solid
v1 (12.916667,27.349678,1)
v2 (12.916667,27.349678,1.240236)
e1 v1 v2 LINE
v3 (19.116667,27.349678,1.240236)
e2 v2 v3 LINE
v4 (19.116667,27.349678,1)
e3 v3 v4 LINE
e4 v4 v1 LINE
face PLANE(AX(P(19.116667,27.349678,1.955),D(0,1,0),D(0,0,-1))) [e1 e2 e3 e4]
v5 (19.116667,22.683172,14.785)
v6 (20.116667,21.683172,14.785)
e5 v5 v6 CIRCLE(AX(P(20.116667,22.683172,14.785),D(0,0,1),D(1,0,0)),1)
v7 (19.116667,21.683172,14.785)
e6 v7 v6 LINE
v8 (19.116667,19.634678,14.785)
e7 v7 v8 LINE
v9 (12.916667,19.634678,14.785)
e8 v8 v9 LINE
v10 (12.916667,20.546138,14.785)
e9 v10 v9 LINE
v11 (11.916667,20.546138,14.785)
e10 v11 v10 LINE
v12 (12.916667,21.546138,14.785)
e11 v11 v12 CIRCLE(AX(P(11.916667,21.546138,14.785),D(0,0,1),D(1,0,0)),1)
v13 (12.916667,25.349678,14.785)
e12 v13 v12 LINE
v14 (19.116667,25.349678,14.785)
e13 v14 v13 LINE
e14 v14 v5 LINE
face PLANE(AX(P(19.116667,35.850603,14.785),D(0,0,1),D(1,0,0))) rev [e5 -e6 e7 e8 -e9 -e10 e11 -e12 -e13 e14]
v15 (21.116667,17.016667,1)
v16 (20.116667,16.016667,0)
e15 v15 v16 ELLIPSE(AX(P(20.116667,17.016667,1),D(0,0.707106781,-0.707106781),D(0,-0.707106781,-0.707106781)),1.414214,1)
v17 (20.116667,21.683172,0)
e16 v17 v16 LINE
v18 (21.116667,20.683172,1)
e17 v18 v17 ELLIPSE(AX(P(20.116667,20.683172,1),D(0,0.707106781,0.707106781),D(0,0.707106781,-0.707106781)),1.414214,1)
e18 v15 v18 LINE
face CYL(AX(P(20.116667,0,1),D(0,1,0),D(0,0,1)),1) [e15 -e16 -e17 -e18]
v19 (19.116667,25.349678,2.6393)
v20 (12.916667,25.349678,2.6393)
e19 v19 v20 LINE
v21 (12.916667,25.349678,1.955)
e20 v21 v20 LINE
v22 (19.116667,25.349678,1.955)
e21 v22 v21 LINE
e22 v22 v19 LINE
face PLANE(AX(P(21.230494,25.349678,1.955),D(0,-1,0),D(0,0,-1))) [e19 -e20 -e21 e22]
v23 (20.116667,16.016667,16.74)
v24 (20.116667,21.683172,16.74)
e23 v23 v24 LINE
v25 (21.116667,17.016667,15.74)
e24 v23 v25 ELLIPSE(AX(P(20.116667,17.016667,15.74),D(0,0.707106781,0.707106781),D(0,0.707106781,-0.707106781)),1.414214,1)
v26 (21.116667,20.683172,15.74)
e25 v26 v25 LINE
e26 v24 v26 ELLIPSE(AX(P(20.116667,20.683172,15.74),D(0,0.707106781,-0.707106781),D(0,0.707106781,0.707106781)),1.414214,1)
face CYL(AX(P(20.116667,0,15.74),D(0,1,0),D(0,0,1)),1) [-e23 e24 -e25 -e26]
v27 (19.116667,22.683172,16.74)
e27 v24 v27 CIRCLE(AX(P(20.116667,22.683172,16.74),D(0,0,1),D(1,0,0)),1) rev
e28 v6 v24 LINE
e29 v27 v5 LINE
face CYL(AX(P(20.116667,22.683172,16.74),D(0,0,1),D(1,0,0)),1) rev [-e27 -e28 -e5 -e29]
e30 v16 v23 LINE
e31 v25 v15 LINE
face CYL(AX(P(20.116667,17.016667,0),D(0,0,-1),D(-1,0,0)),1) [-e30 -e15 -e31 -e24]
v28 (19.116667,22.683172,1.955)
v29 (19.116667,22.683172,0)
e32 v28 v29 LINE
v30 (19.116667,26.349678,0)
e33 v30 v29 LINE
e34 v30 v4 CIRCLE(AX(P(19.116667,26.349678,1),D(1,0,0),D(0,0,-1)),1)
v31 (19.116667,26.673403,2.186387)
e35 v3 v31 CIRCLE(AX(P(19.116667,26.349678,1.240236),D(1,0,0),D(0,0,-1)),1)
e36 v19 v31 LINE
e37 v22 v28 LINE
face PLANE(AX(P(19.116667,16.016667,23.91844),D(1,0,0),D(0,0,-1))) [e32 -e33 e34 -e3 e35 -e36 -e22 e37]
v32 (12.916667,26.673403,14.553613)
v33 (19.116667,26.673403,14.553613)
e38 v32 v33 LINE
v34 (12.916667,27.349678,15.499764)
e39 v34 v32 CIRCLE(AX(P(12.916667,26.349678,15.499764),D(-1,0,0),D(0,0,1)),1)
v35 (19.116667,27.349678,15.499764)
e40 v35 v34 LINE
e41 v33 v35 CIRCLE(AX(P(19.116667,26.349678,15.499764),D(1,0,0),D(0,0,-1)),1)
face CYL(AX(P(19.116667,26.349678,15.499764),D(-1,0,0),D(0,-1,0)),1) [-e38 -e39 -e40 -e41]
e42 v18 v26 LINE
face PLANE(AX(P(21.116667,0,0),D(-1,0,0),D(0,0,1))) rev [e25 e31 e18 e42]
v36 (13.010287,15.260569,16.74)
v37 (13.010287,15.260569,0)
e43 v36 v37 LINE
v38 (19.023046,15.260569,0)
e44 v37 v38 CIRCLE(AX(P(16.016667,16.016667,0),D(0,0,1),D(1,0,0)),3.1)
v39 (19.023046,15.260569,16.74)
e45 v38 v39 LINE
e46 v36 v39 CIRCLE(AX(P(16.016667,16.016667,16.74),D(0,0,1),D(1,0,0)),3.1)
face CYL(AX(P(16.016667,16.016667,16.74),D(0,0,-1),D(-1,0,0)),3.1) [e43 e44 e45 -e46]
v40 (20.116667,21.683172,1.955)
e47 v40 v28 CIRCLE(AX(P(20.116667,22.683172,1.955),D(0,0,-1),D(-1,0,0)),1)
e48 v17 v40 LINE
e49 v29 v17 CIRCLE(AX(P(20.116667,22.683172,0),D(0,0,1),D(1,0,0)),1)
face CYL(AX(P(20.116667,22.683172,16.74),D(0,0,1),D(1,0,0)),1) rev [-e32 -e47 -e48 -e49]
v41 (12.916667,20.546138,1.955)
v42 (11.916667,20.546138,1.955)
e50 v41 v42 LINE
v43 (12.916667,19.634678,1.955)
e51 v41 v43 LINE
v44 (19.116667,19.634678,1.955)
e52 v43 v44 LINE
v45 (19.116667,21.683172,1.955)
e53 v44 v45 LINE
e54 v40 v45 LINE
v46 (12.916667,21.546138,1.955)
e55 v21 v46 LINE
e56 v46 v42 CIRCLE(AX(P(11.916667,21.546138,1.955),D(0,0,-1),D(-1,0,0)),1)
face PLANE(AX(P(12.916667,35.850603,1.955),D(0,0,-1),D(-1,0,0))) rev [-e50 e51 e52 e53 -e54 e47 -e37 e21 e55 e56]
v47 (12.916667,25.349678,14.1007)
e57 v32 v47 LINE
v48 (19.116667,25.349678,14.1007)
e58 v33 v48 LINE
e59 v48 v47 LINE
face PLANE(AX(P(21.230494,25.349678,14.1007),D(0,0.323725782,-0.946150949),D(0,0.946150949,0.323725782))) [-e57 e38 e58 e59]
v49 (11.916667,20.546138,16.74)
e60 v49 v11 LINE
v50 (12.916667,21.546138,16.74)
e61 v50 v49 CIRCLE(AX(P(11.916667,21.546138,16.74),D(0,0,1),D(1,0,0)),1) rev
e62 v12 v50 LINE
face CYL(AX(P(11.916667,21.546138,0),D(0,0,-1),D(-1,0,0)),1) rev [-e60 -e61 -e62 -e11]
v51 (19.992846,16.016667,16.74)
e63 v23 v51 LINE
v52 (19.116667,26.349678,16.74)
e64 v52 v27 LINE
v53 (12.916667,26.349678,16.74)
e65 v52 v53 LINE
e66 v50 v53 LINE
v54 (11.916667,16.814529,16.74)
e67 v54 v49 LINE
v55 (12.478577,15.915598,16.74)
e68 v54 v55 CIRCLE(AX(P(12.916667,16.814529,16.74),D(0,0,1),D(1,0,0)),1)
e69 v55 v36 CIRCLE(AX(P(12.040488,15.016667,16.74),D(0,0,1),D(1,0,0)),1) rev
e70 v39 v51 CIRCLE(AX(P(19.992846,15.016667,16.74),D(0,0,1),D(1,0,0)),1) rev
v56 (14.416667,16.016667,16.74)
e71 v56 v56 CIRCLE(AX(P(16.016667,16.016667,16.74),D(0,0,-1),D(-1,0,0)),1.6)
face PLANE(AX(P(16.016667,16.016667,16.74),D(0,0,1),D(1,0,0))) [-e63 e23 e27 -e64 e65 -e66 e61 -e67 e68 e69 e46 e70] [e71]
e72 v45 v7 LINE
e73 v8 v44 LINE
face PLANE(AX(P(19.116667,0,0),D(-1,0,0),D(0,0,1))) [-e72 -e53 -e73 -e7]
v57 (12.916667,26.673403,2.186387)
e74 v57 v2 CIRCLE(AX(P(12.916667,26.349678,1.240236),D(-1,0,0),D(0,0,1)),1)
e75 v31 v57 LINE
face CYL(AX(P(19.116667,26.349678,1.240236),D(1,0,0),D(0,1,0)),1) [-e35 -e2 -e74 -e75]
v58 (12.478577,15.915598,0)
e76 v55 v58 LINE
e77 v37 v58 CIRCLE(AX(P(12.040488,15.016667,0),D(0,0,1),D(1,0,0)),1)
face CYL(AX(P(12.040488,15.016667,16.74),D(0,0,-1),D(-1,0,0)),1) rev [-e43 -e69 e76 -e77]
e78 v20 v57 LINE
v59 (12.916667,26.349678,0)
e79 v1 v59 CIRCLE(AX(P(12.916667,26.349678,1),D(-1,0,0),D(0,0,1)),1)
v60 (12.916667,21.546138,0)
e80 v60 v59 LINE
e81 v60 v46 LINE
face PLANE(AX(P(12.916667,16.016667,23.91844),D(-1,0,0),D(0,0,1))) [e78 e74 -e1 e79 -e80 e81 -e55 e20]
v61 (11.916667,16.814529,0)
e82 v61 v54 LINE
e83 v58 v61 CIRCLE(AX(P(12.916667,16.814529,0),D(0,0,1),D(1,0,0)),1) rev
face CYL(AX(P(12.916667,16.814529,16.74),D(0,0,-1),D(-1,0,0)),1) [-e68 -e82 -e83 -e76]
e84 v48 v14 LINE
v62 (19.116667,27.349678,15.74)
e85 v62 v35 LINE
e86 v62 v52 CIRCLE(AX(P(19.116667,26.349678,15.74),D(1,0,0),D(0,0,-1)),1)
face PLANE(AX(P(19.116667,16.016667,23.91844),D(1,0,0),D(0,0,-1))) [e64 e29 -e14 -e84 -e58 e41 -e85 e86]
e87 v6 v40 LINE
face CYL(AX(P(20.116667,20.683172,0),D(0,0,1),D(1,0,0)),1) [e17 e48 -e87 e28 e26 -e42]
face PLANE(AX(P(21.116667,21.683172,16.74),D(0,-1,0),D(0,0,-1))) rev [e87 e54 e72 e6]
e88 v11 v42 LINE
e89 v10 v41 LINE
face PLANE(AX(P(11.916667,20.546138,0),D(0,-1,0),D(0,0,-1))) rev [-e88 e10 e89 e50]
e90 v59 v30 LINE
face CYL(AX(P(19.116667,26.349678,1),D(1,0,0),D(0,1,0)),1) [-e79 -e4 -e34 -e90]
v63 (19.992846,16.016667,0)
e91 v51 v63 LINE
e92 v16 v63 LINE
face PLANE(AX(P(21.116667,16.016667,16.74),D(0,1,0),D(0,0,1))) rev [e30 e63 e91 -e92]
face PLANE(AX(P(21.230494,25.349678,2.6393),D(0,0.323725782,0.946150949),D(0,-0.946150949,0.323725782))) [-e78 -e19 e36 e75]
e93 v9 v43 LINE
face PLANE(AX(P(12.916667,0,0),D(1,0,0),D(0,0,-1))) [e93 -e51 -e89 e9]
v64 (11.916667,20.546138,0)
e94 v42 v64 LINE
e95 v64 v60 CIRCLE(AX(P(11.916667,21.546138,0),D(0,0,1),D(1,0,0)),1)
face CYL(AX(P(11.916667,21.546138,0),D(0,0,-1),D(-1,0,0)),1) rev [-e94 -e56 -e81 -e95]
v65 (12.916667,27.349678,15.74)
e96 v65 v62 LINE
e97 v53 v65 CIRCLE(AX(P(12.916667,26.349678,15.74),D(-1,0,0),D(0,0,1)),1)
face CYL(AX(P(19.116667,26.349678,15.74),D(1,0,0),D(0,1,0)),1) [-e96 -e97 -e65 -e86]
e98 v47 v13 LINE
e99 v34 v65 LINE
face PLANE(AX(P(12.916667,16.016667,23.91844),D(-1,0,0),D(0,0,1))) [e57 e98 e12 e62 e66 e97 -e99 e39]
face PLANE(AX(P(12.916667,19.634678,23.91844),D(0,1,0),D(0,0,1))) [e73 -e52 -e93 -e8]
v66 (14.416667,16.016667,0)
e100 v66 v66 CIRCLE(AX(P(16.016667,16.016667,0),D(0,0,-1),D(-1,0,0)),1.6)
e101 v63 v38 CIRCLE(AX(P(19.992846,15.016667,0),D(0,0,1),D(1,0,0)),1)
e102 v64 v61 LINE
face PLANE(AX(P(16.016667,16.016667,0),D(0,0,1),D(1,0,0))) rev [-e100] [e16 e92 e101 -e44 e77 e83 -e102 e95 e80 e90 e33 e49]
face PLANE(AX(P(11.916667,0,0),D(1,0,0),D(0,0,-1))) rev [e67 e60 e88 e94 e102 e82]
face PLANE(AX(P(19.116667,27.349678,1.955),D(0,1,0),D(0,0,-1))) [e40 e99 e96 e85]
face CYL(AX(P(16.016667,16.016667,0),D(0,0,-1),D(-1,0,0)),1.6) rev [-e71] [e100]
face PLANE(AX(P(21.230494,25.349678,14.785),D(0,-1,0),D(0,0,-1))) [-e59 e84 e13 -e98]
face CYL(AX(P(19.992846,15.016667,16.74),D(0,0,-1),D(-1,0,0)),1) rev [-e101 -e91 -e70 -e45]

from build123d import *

# Parameters (mm, degrees)
ESBO_O1_R                = 3.1
ESBO_O1_R_2              = 1.55
RESSALTO_EXTRUS_O1_DEPTH = 16.74
BOSS_EXTRUDE1_DEPTH      = 16.74
SKETCH2_W                = 6.2
SKETCH2_H                = 1.955
BOSS_EXTRUDE2_DEPTH      = 7.715
BOSS_EXTRUDE3_DEPTH      = 6.2
SKETCH5_W                = 16.74
SKETCH5_H                = 5.66650546
BOSS_EXTRUDE4_DEPTH      = 2
SKETCH6_W                = 16.74
SKETCH6_H                = 4.529470895
BOSS_EXTRUDE5_DEPTH      = 1
FILLET1_R                = 1
FILLET4_R                = 1
M3_CLEARANCE_HOLE1_D     = 3.2


with BuildPart() as part:
    # Esboço1 → Ressalto-extrusão1 (new body)
    with BuildSketch(Plane.XY):
        with Locations((16.016666667, 16.016666667)):
            Circle(ESBO_O1_R)
        with Locations((16.016666667, 16.016666667)):
            Circle(ESBO_O1_R_2, mode=Mode.SUBTRACT)
    extrude(amount=RESSALTO_EXTRUS_O1_DEPTH)

    # Sketch1 → Boss-Extrude1 (add)
    with BuildSketch(Plane(origin=(0, 0, 0), x_dir=(-1, 0, 0), z_dir=(0, 0, -1))):
        with BuildLine():
            Line((-12.916666667, 16.016666667), (-12.916666667, 19.634677588))
            Line((-12.916666667, 19.634677588), (-19.116666667, 19.634677588))
            Line((-19.116666667, 19.634677588), (-19.116666667, 16.016666667))
            ThreePointArc((-19.116666667, 16.016666667), (-16.016666667, 19.116666667), (-12.916666667, 16.016666667))
        make_face()
    extrude(amount=-BOSS_EXTRUDE1_DEPTH)

    # Sketch2 → Boss-Extrude2 (add)
    with BuildSketch(Plane(origin=(0, 19.634677588, 0), x_dir=(1, 0, 0), z_dir=(0, 1, 0))):
        with Locations((16.016666667, -0.9775)):
            Rectangle(SKETCH2_W, SKETCH2_H)
        with Locations((16.016666667, -15.7625)):
            Rectangle(SKETCH2_W, SKETCH2_H)
    extrude(amount=BOSS_EXTRUDE2_DEPTH)

    # Sketch4 → Boss-Extrude3 (add)
    with BuildSketch(Plane.ZY.offset(-12.916666667)):
        Polygon((1.955, 27.349677588), (1.955, 25.349677588), (2.639300497, 25.349677588), align=None)
        Polygon((14.100699503, 25.349677588), (14.785, 27.349677588), (14.785, 25.349677588), align=None)
    extrude(amount=-BOSS_EXTRUDE3_DEPTH)

    # Sketch5 → Boss-Extrude4 (add)
    with BuildSketch(Plane(origin=(19.116666667, 0, 0), x_dir=(0, 0, -1), z_dir=(1, 0, 0))):
        with Locations((-8.37, 18.849919397)):
            Rectangle(SKETCH5_W, SKETCH5_H)
    extrude(amount=BOSS_EXTRUDE4_DEPTH)

    # Sketch6 → Boss-Extrude5 (add)
    with BuildSketch(Plane.ZY.offset(-12.916666667)):
        with Locations((8.37, 18.281402115)):
            Rectangle(SKETCH6_W, SKETCH6_H)
    extrude(amount=BOSS_EXTRUDE5_DEPTH)

    # Fillet1
    fillet1_edges = [part.edges().sort_by_distance(p)[0] for p in [
        (21.116666667, 21.683172127, 8.37),
        (21.116666667, 18.849919397, 0),
        (21.116666667, 16.016666667, 8.37),
        (21.116666667, 18.849919397, 16.74),
        (16.016666667, 27.349677588, 0),
        (16.016666667, 27.349677588, 1.955),
        (16.016666667, 27.349677588, 16.74),
        (16.016666667, 27.349677588, 14.785),
        (19.116666667, 21.683172127, 15.7625),
        (12.916666667, 20.546137562, 15.7625),
        (12.916666667, 20.546137562, 0.9775),
        (19.116666667, 21.683172127, 0.9775),
        (12.916666667, 16.016666667, 8.37),
        (19.116666667, 16.016666667, 8.37),
    ]]
    fillet(fillet1_edges, radius=FILLET1_R - 0.0001)  # a hair under: the kernel refuses the full size

    # Fillet4
    fillet4_edges = [part.edges().sort_by_distance(p)[0] for p in [
        (11.916666667, 16.016666667, 8.37),
    ]]
    fillet(fillet4_edges, radius=FILLET4_R)

    # M3 Clearance Hole1 (through all)
    with Locations(Plane(origin=(0, 0, 0), x_dir=(-1, 0, 0), z_dir=(0, 0, -1))):
        with Locations((-16.016666667, 16.016666667)):
            Hole(M3_CLEARANCE_HOLE1_D / 2)


solid = part.part
